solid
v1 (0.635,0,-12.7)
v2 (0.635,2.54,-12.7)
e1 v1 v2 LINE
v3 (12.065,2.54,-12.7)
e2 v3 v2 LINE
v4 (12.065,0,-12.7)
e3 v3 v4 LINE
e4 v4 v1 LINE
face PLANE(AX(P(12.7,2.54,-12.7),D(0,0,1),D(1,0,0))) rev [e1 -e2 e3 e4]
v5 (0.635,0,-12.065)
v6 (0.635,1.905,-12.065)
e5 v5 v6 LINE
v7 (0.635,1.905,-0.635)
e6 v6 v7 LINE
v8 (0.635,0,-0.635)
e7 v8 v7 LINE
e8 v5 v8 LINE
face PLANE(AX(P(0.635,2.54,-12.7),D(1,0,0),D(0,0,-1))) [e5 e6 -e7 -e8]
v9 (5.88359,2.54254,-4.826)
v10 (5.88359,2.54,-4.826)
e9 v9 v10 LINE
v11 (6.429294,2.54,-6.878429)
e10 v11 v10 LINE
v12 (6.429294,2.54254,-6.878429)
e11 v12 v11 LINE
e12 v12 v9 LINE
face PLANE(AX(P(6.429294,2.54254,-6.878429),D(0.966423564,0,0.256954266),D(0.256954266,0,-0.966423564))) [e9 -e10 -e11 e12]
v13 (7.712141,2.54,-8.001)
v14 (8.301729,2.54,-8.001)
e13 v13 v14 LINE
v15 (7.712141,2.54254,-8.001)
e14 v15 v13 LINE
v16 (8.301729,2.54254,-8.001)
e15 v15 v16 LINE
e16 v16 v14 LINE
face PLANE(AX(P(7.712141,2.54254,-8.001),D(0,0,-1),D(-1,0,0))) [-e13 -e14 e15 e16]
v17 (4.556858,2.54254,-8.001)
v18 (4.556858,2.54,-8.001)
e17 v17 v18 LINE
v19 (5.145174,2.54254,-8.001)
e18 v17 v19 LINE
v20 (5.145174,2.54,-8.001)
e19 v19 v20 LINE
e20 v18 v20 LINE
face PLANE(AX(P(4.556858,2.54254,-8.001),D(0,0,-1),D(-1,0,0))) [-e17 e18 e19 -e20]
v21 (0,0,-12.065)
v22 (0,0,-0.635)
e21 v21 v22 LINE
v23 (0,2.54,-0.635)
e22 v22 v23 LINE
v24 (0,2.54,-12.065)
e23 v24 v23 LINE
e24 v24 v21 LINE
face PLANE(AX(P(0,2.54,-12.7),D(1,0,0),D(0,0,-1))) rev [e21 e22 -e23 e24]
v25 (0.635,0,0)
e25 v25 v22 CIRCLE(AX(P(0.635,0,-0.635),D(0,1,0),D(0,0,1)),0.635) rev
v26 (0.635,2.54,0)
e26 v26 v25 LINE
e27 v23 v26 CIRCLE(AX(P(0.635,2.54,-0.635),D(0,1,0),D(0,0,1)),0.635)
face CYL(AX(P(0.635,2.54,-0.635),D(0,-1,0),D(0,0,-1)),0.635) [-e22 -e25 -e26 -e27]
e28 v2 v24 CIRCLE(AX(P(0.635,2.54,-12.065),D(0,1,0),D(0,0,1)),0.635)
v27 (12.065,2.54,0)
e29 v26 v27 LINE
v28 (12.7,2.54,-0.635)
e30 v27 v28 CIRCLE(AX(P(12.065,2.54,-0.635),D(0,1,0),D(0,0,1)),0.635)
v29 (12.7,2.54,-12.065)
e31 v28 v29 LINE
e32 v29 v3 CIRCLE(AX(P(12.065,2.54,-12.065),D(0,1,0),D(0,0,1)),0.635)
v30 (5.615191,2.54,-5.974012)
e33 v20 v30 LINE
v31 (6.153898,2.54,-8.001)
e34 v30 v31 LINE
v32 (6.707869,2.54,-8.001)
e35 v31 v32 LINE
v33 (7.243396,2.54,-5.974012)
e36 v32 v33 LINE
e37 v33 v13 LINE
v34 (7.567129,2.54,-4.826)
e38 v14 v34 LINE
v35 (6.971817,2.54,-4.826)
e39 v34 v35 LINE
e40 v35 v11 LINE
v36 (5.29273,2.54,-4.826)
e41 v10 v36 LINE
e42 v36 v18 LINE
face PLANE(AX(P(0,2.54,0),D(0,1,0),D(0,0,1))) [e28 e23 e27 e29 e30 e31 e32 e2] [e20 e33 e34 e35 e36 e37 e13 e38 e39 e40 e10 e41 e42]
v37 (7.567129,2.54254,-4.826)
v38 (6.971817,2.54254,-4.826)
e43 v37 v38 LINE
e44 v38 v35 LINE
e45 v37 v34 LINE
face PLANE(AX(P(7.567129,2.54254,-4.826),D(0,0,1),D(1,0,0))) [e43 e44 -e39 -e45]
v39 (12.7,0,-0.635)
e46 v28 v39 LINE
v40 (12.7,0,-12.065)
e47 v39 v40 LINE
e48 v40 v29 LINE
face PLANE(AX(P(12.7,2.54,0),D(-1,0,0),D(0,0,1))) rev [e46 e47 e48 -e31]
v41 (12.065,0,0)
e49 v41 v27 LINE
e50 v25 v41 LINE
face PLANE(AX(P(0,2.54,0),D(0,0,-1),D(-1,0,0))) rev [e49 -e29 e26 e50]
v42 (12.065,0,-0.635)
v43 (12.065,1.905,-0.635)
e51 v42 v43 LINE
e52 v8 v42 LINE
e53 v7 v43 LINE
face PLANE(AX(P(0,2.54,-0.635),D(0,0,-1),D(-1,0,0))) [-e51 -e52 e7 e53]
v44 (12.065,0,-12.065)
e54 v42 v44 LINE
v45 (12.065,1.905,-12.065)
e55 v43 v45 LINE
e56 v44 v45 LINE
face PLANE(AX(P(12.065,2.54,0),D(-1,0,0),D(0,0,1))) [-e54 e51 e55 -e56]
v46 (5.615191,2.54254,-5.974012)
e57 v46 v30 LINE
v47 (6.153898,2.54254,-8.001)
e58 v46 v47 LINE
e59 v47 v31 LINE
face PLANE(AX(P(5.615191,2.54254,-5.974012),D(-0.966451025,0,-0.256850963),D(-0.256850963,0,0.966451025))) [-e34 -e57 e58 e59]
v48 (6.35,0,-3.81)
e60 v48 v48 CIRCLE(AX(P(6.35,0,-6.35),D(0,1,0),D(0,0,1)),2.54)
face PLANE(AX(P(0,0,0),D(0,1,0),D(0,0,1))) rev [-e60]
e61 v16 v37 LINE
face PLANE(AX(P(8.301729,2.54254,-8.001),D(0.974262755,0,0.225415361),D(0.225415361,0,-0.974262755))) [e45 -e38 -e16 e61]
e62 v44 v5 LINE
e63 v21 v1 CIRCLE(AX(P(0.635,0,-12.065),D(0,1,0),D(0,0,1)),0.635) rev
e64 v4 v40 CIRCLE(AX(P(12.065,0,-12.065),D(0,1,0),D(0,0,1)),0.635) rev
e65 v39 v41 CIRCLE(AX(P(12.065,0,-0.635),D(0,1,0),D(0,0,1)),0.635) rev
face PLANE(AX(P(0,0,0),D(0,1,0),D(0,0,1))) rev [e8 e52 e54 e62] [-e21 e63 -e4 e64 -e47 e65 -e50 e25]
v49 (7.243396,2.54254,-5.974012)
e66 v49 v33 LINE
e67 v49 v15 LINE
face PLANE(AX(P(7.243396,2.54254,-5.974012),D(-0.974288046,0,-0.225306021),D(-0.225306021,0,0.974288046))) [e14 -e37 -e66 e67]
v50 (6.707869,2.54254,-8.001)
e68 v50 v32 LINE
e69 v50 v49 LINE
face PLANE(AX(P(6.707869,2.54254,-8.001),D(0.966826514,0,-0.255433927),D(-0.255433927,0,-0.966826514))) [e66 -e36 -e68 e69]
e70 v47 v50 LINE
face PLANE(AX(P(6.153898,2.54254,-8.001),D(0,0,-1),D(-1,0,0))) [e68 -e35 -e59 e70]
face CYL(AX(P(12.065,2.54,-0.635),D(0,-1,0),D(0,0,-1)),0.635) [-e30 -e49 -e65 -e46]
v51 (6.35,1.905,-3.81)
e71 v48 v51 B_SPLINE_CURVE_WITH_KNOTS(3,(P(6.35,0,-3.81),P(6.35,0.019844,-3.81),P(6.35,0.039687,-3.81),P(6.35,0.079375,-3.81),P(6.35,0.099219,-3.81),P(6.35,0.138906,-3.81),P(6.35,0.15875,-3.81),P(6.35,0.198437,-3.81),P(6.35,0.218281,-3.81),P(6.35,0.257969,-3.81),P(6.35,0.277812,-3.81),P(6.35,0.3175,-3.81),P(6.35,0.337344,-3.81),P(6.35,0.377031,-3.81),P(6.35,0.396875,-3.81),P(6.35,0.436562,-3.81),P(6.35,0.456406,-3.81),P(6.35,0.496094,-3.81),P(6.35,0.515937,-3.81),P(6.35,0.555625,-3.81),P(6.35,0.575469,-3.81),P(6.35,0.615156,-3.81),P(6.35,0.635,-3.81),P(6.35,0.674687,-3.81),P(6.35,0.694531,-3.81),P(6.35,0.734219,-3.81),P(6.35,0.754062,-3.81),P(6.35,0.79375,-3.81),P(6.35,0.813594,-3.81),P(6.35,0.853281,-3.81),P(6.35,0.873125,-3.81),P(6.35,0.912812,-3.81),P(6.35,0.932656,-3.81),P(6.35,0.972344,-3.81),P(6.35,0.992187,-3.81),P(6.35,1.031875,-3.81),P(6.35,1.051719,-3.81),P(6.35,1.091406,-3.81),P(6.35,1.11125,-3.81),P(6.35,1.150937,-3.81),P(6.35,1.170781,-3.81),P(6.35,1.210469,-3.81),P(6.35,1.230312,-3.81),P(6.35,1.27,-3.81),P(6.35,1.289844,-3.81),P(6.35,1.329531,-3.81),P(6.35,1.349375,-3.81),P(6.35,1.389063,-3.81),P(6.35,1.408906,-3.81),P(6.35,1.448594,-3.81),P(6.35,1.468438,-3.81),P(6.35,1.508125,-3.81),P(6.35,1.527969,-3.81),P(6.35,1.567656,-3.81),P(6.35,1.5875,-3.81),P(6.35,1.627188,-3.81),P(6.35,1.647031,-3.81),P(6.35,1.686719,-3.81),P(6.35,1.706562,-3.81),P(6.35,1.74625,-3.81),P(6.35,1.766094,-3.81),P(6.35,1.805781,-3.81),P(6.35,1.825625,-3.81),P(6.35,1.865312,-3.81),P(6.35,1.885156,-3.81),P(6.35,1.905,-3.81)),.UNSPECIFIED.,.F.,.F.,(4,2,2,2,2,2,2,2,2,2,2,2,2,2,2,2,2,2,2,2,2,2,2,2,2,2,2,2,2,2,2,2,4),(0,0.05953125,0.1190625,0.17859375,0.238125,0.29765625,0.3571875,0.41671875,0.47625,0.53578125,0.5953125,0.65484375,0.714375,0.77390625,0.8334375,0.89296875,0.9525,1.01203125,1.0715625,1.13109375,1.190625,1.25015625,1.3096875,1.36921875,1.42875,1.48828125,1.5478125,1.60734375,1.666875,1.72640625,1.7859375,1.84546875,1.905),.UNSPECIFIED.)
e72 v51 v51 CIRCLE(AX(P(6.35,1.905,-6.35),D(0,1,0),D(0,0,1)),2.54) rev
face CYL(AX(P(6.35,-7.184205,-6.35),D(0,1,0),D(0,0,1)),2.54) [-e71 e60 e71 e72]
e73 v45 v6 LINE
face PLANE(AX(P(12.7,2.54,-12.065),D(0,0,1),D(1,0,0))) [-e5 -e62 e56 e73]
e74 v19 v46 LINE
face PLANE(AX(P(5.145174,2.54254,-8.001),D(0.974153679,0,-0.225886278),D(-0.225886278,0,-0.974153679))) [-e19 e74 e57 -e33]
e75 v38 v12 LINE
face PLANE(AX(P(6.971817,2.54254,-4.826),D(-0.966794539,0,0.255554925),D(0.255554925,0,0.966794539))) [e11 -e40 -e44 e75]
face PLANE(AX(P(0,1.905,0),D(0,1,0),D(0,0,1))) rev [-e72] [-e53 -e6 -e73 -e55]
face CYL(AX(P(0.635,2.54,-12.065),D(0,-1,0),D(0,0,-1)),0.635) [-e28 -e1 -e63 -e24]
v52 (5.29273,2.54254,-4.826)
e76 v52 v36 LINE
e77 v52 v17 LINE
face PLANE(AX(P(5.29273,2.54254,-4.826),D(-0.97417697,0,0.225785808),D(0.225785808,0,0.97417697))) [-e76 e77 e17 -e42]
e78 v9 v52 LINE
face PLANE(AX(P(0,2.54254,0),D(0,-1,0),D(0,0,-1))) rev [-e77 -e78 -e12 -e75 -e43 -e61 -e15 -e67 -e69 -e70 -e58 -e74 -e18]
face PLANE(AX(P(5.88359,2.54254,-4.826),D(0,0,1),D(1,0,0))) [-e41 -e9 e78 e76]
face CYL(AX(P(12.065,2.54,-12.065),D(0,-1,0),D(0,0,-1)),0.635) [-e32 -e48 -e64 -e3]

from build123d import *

# Parameters (mm, degrees)
SKETCH1_W           = 12.7
SKETCH1_H           = 12.7
BOSS_EXTRUDE1_DEPTH = 2.54
FILLET1_R           = 0.635
SHELL1_START        = 0.635
SHELL1_OUTLINE_W    = 1.905
SHELL1_OUTLINE_H    = 11.43
SHELL1_DEPTH        = 11.43
SKETCH2_R           = 2.54
BOSS_EXTRUDE2_DEPTH = 1.905
BOSS_EXTRUDE3_DEPTH = 0.00254


# Read off the part's stored shape, not the designer's step: Shell1
with BuildPart() as part:
    # Sketch1 → Boss-Extrude1 (new body)
    with BuildSketch(Plane(origin=(0, 0, 0), x_dir=(1, 0, 0), z_dir=(0, 1, 0))):
        with Locations((6.35, 6.35)):
            Rectangle(SKETCH1_W, SKETCH1_H)
    extrude(amount=BOSS_EXTRUDE1_DEPTH)

    # Fillet1
    fillet1_edges = [part.edges().sort_by_distance(p)[0] for p in [
        (0, 1.27, -12.7),
        (12.7, 1.27, -12.7),
        (12.7, 1.27, 0),
        (0, 1.27, 0),
    ]]
    fillet(fillet1_edges, radius=FILLET1_R)

    # Shell1 outline → Shell1 (cut)
    with BuildSketch(Plane.YZ.offset(SHELL1_START)):
        with Locations((0.9525, -6.35)):
            Rectangle(SHELL1_OUTLINE_W, SHELL1_OUTLINE_H)
    extrude(amount=SHELL1_DEPTH, mode=Mode.SUBTRACT)

    # Sketch2 → Boss-Extrude2 (add)
    with BuildSketch(Plane(origin=(0, 1.905, 0), x_dir=(-1, 0, 0), z_dir=(0, -1, 0))):
        with Locations(Location((-6.35, 6.35, 0), (0, 0, 270))):
            Circle(SKETCH2_R)
    extrude(amount=BOSS_EXTRUDE2_DEPTH)

    # Sketch3 → Boss-Extrude3 (add)
    with BuildSketch(Plane(origin=(0, 2.54, 0), x_dir=(1, 0, 0), z_dir=(0, 1, 0))):
        Polygon((4.556857692, 8.001), (5.145173998, 8.001), (5.615191026, 5.974011819), (6.153897957, 8.001), (6.707869311, 8.001), (7.243396154, 5.974011819), (7.712141146, 8.001), (8.301729487, 8.001), (7.567129127, 4.826), (6.971816627, 4.826), (6.42929359, 6.878428886), (5.883590465, 4.826), (5.292730088, 4.826), align=None)
    extrude(amount=BOSS_EXTRUDE3_DEPTH)


solid = part.part
